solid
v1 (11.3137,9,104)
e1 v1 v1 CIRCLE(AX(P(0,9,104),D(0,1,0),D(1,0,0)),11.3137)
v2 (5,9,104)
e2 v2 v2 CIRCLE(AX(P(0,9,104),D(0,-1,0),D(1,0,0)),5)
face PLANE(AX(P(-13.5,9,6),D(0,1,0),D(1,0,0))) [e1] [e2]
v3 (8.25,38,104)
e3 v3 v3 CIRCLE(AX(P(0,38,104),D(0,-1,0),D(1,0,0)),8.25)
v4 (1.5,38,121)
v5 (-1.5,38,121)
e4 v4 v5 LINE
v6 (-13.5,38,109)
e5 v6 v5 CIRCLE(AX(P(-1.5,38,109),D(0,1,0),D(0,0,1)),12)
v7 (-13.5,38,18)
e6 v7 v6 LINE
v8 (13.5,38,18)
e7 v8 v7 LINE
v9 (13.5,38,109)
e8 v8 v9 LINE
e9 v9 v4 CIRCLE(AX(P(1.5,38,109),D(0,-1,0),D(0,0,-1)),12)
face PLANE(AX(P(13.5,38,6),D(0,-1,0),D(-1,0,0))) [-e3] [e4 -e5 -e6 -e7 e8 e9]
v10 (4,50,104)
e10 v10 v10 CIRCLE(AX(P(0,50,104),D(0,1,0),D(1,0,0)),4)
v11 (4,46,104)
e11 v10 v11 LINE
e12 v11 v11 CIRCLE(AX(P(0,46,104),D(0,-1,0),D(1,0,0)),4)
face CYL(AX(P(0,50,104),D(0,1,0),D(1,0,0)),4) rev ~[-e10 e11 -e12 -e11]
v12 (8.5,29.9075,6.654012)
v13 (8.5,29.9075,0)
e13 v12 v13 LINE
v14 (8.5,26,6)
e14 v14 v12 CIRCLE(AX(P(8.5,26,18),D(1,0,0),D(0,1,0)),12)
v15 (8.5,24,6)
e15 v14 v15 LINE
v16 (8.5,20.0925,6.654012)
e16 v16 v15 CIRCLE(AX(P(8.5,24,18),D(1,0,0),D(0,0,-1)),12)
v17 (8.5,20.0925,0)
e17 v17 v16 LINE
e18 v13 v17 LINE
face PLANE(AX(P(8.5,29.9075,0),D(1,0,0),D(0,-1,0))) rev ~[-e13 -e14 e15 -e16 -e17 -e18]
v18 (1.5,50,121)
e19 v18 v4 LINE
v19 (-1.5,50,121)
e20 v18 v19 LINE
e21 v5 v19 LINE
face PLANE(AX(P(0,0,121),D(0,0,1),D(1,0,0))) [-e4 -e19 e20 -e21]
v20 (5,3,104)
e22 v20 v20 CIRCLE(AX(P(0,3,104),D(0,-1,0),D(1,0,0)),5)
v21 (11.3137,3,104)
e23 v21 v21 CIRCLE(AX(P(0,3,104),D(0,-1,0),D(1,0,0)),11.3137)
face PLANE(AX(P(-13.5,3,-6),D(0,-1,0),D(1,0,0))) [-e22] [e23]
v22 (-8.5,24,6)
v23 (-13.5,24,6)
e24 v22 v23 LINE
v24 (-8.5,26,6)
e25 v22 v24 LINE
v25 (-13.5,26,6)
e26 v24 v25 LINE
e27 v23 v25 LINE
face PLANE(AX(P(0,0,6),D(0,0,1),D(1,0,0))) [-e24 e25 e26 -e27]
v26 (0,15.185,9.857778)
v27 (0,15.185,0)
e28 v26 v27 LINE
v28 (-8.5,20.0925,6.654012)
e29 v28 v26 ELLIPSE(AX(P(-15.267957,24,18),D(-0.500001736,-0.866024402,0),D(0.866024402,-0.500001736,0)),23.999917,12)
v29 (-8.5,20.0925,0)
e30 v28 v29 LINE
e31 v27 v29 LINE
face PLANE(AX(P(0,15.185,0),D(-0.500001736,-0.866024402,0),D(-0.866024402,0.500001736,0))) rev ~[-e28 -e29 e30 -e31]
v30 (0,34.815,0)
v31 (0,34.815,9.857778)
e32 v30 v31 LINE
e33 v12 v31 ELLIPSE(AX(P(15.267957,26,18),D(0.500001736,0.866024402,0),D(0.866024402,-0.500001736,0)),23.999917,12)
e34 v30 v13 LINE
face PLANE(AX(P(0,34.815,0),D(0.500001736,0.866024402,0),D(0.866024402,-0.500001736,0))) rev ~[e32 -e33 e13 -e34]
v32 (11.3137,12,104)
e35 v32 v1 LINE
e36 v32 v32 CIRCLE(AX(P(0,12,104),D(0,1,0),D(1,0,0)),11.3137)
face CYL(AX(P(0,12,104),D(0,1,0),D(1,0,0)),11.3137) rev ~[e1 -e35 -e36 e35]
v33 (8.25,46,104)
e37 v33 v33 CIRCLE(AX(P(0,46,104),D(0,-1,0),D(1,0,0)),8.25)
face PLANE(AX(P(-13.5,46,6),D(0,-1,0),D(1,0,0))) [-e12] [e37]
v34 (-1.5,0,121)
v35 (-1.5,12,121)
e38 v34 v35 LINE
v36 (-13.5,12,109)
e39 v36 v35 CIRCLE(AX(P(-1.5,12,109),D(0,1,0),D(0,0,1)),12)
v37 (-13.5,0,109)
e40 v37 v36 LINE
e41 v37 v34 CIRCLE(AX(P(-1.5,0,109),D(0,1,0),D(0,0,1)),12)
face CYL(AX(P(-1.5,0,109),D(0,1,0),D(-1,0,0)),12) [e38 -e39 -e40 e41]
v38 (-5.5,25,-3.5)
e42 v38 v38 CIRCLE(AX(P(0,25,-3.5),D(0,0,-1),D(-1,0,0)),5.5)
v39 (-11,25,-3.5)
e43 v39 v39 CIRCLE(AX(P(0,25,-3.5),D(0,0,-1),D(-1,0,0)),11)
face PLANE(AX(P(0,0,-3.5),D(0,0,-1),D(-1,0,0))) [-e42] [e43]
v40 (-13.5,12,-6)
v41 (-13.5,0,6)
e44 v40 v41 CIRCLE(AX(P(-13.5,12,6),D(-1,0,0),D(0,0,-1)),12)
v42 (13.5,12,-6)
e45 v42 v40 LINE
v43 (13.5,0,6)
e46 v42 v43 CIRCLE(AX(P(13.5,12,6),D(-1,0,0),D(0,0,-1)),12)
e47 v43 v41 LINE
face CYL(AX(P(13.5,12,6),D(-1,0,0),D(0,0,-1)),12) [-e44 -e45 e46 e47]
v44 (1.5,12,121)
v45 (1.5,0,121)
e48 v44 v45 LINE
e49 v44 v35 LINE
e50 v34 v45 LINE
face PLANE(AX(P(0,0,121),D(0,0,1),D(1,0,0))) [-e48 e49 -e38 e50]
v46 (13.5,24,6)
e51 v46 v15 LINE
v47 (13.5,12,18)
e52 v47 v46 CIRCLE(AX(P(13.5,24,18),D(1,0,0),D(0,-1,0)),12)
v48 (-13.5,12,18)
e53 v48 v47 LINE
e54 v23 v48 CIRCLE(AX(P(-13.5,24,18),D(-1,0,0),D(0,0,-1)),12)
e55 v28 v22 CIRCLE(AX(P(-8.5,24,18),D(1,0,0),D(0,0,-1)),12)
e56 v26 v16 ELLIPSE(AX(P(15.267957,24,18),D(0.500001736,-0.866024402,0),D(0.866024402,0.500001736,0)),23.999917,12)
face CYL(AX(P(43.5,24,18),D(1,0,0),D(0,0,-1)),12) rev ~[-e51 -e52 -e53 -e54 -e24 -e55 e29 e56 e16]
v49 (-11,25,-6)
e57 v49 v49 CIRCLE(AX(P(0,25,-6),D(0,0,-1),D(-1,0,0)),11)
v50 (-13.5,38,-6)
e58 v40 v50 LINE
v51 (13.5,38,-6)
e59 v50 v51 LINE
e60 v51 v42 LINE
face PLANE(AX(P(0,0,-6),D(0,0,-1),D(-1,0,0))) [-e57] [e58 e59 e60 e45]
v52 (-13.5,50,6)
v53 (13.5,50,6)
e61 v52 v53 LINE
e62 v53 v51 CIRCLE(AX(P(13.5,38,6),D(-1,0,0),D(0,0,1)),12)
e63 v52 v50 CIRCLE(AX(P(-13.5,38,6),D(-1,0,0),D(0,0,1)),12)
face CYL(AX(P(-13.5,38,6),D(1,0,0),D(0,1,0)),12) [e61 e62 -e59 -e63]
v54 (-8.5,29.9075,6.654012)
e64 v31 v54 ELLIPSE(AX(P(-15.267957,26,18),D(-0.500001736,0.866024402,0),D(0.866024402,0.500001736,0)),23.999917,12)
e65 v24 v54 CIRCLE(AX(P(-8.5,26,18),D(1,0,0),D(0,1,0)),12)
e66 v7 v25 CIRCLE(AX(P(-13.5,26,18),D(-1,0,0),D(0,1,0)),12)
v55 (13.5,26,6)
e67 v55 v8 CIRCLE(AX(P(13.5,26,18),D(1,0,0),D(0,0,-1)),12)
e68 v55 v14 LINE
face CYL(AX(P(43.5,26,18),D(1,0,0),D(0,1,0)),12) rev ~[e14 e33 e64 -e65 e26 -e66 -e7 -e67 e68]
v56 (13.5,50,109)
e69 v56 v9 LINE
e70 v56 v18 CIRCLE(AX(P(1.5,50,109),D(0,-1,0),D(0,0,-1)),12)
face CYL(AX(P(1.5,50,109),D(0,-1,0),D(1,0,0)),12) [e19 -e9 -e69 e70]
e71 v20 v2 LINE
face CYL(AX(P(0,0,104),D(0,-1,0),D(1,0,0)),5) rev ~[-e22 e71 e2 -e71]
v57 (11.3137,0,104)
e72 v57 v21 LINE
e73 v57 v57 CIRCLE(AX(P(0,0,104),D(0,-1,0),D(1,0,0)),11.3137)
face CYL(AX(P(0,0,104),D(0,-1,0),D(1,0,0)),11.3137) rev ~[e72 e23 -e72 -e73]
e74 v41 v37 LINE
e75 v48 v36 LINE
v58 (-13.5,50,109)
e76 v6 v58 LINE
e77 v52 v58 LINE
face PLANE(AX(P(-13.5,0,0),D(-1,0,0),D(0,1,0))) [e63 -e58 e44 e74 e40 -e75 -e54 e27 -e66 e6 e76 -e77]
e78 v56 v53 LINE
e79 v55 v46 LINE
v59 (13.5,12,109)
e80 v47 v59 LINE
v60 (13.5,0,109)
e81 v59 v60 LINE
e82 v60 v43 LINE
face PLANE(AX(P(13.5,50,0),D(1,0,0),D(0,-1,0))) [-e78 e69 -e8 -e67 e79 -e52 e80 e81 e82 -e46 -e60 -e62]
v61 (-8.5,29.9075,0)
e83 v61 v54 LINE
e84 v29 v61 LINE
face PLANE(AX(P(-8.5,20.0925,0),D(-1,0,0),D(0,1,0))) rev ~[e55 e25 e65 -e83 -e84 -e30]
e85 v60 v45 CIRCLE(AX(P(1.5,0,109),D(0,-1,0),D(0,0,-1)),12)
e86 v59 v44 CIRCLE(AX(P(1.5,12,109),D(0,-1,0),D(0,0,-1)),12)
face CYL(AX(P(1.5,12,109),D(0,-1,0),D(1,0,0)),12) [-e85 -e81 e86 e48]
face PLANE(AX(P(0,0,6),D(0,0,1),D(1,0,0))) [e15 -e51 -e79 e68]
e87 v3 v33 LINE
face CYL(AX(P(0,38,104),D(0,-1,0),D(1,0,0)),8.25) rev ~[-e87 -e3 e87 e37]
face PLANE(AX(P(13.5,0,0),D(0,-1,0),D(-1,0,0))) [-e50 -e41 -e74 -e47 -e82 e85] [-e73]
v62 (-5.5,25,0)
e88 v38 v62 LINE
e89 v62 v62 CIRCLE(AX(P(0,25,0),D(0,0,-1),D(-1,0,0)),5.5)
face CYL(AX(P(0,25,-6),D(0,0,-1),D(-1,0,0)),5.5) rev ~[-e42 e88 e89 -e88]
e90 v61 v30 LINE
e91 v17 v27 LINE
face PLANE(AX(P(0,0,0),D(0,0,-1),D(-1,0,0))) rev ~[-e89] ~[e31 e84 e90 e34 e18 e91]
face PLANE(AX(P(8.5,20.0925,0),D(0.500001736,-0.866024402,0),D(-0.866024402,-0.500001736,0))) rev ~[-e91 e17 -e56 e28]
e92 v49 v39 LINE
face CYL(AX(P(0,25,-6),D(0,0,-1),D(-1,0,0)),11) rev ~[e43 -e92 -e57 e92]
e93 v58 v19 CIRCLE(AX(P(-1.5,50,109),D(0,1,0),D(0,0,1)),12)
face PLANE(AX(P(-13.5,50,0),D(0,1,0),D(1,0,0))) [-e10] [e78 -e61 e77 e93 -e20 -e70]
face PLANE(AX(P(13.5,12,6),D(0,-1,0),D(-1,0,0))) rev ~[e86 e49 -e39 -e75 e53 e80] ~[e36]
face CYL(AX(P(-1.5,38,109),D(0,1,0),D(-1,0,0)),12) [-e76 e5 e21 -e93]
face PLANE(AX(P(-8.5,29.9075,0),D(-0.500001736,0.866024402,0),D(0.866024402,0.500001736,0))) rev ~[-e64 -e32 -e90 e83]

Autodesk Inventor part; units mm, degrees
ref_plane "YZ Plane" through (0, 0, 0) normal (1, 0, 0) x (0, 1, 0)
ref_plane "XZ Plane" through (0, 0, 0) normal (0, 1, 0) x (-1, 0, 0)
ref_plane "XY Plane" through (0, 0, 0) normal (0, 0, 1) x (1, 0, 0)
sketch "Boceto1" plane through (0, 0, 0) normal (0, 0, 1) x (1, 0, 0)
  line L0 (-13.5, 50) -> (13.5, 50)
  line L1 (13.5, 50) -> (13.5, 0)
  line L2 (13.5, 0) -> (-13.5, 0)
  line L3 (-13.5, 0) -> (-13.5, 50)
  line L4 (0, 0) -> (0, 50) construction
  line L5 (0, 34.815) -> (8.5, 29.9075)
  line L6 (8.5, 29.9075) -> (8.5, 20.0925)
  line L7 (8.5, 20.0925) -> (0, 15.185)
  line L8 (0, 15.185) -> (-8.5, 20.0925)
  line L9 (-8.5, 20.0925) -> (-8.5, 29.9075)
  line L10 (-8.5, 29.9075) -> (0, 34.815)
  line L11 (-8.5, 29.9075) -> (-13.5, 29.9075) construction
  line L12 (8.5, 29.9075) -> (13.5, 29.9075) construction
  point P0 (0, 25)
  dimension "d20" = 17
  dimension "d21" = 5
  dimension "d22" = 27
  dimension "d23" = 50
extrude "Extrusión1" add sketch "Boceto1" along normal blind 6
sketch "Boceto2" plane through (0, 0, 0) normal (0, 0, -1) x (-1, 0, 0)
  line L0 (-8.5, 20.0925) -> (-8.5, 29.9075) projected
  line L1 (-8.5, 29.9075) -> (0, 34.815) projected
  line L2 (0, 34.815) -> (8.5, 29.9075) projected
  line L3 (8.5, 29.9075) -> (8.5, 20.0925) projected
  line L4 (8.5, 20.0925) -> (0, 15.185) projected
  line L5 (0, 15.185) -> (-8.5, 20.0925) projected
  line L6 (13.5, 50) -> (-13.5, 50) projected
  line L7 (-13.5, 50) -> (-13.5, 0) projected
  line L8 (-13.5, 0) -> (13.5, 0) projected
  line L9 (13.5, 0) -> (13.5, 50) projected
  point P0 (0, 0)
extrude "Extrusión2" add sketch "Boceto2" along normal blind 6 contours L0 L1 L2 L3 L4 L5 | L9 L8 L7 L6
sketch "Boceto3" plane through (0, 0, -6) normal (0, 0, -1) x (-1, 0, 0)
  line L0 (0, 0) -> (0, 50) construction
  line L1 (-13.5, 50) -> (13.5, 50) projected
  circle A0 centre (0, 25) radius 5.5
  dimension "d18" = 11
extrude "Extrusión3" cut sketch "Boceto3" against normal up to next
sketch "Boceto5" plane through (0, 0, 6) normal (0, 0, 1) x (1, 0, 0)
  line L0 (-13.5, 0) -> (-13.5, 50) projected
  line L1 (13.5, 50) -> (13.5, 0) projected
  line L2 (-13.5, 0) -> (13.5, 0)
  line L3 (13.5, 0) -> (13.5, 12)
  line L4 (13.5, 12) -> (-13.5, 12)
  line L5 (-13.5, 12) -> (-13.5, 0)
  line L6 (13.5, 50) -> (-13.5, 50) projected
  line L7 (-13.5, 50) -> (13.5, 50)
  line L8 (13.5, 50) -> (13.5, 38)
  line L9 (13.5, 38) -> (-13.5, 38)
  line L10 (-13.5, 38) -> (-13.5, 50)
  line L11 (-17.3027, 25) -> (12.0796, 25) construction
  line L12 (-8.5, 20.0925) -> (-8.5, 29.9075) projected
  point P0 (0, 0)
  point P1 (-8.5, 25)
  dimension "d24" = 12
extrude "Extrusión4" add sketch "Boceto5" along normal blind 115 contours L0 L4 L1 L2 | L0 L6 L1 L9
sketch "Boceto9" plane through (-13.5, 0, -6) normal (0, -1, 0) x (1, 0, 0)
  circle A0 centre (13.5, 110) radius 5
  line L0 (0, 127) -> (27, 127) projected
  line L1 (13.5, 110) -> (13.5, 115)
  line L2 (13.5, 115) -> (13.5, 127)
  line L3 (0, 127) -> (27, 127) projected
  point P0 (13.5, 6)
  dimension "d25" = 10
  dimension "d32" = 12
extrude "Extrusión8" cut sketch "Boceto9" against normal up to surface (12 mm away)
sketch "Boceto10" plane through (0, 0, -6) normal (0, 0, -1) x (-1, 0, 0)
  circle A0 centre (0, 25) radius 11
  circle A1 centre (0, 25) radius 5.5 projected
  point P0 (0, 0)
  dimension "d29" = 22
extrude "Extrusión9" cut sketch "Boceto10" against normal blind 2.5
sketch "Boceto11" plane through (-13.5, 12, 6) normal (0, 1, 0) x (1, 0, 0)
  line L0 (21.5, -106) -> (5.5, -106) construction
  line L1 (5.5, -106) -> (5.5, -90) construction
  line L2 (5.5, -90) -> (21.5, -90) construction
  line L3 (21.5, -90) -> (21.5, -106) construction
  line L4 (5.5, -106) -> (21.5, -90) construction
  circle A0 centre (13.5, -98) radius 8 construction
  circle A1 centre (13.5, -98) radius 11.3137
  line L5 (27, 0) -> (27, -115) projected
  circle A2 centre (13.5, -98) radius 5 projected
  point P0 (13.5, 6)
  dimension "d45" = 16
extrude "Extrusión10" cut sketch "Boceto11" against normal blind 3 contours A1 | A2
sketch "Boceto12" plane through (-13.5, 0, -6) normal (0, -1, 0) x (1, 0, 0)
  circle A0 centre (13.5, 110) radius 11.3137 projected
  line L0 (0, 127) -> (0, 0) projected
  point P0 (13.5, 6)
extrude "Extrusión11" cut sketch "Boceto12" against normal blind 3
sketch "Boceto14" plane through (-13.5, 50, -6) normal (0, 1, 0) x (1, 0, 0)
  circle A0 centre (13.5, -110) radius 5 projected
  circle A1 centre (13.5, -110) radius 4
  point P0 (13.5, -6)
  dimension "d38" = 8
extrude "Extrusión12" cut sketch "Boceto14" against normal up to next contours A1
sketch "Boceto15" plane through (-13.5, 38, 6) normal (0, -1, 0) x (1, 0, 0)
  circle A0 centre (13.5, 98) radius 4 projected
  circle A1 centre (13.5, 98) radius 8.25
  point P0 (13.5, -6)
  dimension "d41" = 16.5
extrude "Extrusión13" cut sketch "Boceto15" against normal blind 8
fillet "Empalme4" radius 12 4 edges at (13.5, 44, 121) (-13.5, 44, 121) (13.5, 6, 121) (-13.5, 6, 121)
fillet "Empalme5" radius 12 2 edges at (0, 0, -6) (0, 50, -6)
fillet "Empalme6" radius 12 2 edges at (0, 12, 6) (0, 38, 6)
properties part number "U3"
